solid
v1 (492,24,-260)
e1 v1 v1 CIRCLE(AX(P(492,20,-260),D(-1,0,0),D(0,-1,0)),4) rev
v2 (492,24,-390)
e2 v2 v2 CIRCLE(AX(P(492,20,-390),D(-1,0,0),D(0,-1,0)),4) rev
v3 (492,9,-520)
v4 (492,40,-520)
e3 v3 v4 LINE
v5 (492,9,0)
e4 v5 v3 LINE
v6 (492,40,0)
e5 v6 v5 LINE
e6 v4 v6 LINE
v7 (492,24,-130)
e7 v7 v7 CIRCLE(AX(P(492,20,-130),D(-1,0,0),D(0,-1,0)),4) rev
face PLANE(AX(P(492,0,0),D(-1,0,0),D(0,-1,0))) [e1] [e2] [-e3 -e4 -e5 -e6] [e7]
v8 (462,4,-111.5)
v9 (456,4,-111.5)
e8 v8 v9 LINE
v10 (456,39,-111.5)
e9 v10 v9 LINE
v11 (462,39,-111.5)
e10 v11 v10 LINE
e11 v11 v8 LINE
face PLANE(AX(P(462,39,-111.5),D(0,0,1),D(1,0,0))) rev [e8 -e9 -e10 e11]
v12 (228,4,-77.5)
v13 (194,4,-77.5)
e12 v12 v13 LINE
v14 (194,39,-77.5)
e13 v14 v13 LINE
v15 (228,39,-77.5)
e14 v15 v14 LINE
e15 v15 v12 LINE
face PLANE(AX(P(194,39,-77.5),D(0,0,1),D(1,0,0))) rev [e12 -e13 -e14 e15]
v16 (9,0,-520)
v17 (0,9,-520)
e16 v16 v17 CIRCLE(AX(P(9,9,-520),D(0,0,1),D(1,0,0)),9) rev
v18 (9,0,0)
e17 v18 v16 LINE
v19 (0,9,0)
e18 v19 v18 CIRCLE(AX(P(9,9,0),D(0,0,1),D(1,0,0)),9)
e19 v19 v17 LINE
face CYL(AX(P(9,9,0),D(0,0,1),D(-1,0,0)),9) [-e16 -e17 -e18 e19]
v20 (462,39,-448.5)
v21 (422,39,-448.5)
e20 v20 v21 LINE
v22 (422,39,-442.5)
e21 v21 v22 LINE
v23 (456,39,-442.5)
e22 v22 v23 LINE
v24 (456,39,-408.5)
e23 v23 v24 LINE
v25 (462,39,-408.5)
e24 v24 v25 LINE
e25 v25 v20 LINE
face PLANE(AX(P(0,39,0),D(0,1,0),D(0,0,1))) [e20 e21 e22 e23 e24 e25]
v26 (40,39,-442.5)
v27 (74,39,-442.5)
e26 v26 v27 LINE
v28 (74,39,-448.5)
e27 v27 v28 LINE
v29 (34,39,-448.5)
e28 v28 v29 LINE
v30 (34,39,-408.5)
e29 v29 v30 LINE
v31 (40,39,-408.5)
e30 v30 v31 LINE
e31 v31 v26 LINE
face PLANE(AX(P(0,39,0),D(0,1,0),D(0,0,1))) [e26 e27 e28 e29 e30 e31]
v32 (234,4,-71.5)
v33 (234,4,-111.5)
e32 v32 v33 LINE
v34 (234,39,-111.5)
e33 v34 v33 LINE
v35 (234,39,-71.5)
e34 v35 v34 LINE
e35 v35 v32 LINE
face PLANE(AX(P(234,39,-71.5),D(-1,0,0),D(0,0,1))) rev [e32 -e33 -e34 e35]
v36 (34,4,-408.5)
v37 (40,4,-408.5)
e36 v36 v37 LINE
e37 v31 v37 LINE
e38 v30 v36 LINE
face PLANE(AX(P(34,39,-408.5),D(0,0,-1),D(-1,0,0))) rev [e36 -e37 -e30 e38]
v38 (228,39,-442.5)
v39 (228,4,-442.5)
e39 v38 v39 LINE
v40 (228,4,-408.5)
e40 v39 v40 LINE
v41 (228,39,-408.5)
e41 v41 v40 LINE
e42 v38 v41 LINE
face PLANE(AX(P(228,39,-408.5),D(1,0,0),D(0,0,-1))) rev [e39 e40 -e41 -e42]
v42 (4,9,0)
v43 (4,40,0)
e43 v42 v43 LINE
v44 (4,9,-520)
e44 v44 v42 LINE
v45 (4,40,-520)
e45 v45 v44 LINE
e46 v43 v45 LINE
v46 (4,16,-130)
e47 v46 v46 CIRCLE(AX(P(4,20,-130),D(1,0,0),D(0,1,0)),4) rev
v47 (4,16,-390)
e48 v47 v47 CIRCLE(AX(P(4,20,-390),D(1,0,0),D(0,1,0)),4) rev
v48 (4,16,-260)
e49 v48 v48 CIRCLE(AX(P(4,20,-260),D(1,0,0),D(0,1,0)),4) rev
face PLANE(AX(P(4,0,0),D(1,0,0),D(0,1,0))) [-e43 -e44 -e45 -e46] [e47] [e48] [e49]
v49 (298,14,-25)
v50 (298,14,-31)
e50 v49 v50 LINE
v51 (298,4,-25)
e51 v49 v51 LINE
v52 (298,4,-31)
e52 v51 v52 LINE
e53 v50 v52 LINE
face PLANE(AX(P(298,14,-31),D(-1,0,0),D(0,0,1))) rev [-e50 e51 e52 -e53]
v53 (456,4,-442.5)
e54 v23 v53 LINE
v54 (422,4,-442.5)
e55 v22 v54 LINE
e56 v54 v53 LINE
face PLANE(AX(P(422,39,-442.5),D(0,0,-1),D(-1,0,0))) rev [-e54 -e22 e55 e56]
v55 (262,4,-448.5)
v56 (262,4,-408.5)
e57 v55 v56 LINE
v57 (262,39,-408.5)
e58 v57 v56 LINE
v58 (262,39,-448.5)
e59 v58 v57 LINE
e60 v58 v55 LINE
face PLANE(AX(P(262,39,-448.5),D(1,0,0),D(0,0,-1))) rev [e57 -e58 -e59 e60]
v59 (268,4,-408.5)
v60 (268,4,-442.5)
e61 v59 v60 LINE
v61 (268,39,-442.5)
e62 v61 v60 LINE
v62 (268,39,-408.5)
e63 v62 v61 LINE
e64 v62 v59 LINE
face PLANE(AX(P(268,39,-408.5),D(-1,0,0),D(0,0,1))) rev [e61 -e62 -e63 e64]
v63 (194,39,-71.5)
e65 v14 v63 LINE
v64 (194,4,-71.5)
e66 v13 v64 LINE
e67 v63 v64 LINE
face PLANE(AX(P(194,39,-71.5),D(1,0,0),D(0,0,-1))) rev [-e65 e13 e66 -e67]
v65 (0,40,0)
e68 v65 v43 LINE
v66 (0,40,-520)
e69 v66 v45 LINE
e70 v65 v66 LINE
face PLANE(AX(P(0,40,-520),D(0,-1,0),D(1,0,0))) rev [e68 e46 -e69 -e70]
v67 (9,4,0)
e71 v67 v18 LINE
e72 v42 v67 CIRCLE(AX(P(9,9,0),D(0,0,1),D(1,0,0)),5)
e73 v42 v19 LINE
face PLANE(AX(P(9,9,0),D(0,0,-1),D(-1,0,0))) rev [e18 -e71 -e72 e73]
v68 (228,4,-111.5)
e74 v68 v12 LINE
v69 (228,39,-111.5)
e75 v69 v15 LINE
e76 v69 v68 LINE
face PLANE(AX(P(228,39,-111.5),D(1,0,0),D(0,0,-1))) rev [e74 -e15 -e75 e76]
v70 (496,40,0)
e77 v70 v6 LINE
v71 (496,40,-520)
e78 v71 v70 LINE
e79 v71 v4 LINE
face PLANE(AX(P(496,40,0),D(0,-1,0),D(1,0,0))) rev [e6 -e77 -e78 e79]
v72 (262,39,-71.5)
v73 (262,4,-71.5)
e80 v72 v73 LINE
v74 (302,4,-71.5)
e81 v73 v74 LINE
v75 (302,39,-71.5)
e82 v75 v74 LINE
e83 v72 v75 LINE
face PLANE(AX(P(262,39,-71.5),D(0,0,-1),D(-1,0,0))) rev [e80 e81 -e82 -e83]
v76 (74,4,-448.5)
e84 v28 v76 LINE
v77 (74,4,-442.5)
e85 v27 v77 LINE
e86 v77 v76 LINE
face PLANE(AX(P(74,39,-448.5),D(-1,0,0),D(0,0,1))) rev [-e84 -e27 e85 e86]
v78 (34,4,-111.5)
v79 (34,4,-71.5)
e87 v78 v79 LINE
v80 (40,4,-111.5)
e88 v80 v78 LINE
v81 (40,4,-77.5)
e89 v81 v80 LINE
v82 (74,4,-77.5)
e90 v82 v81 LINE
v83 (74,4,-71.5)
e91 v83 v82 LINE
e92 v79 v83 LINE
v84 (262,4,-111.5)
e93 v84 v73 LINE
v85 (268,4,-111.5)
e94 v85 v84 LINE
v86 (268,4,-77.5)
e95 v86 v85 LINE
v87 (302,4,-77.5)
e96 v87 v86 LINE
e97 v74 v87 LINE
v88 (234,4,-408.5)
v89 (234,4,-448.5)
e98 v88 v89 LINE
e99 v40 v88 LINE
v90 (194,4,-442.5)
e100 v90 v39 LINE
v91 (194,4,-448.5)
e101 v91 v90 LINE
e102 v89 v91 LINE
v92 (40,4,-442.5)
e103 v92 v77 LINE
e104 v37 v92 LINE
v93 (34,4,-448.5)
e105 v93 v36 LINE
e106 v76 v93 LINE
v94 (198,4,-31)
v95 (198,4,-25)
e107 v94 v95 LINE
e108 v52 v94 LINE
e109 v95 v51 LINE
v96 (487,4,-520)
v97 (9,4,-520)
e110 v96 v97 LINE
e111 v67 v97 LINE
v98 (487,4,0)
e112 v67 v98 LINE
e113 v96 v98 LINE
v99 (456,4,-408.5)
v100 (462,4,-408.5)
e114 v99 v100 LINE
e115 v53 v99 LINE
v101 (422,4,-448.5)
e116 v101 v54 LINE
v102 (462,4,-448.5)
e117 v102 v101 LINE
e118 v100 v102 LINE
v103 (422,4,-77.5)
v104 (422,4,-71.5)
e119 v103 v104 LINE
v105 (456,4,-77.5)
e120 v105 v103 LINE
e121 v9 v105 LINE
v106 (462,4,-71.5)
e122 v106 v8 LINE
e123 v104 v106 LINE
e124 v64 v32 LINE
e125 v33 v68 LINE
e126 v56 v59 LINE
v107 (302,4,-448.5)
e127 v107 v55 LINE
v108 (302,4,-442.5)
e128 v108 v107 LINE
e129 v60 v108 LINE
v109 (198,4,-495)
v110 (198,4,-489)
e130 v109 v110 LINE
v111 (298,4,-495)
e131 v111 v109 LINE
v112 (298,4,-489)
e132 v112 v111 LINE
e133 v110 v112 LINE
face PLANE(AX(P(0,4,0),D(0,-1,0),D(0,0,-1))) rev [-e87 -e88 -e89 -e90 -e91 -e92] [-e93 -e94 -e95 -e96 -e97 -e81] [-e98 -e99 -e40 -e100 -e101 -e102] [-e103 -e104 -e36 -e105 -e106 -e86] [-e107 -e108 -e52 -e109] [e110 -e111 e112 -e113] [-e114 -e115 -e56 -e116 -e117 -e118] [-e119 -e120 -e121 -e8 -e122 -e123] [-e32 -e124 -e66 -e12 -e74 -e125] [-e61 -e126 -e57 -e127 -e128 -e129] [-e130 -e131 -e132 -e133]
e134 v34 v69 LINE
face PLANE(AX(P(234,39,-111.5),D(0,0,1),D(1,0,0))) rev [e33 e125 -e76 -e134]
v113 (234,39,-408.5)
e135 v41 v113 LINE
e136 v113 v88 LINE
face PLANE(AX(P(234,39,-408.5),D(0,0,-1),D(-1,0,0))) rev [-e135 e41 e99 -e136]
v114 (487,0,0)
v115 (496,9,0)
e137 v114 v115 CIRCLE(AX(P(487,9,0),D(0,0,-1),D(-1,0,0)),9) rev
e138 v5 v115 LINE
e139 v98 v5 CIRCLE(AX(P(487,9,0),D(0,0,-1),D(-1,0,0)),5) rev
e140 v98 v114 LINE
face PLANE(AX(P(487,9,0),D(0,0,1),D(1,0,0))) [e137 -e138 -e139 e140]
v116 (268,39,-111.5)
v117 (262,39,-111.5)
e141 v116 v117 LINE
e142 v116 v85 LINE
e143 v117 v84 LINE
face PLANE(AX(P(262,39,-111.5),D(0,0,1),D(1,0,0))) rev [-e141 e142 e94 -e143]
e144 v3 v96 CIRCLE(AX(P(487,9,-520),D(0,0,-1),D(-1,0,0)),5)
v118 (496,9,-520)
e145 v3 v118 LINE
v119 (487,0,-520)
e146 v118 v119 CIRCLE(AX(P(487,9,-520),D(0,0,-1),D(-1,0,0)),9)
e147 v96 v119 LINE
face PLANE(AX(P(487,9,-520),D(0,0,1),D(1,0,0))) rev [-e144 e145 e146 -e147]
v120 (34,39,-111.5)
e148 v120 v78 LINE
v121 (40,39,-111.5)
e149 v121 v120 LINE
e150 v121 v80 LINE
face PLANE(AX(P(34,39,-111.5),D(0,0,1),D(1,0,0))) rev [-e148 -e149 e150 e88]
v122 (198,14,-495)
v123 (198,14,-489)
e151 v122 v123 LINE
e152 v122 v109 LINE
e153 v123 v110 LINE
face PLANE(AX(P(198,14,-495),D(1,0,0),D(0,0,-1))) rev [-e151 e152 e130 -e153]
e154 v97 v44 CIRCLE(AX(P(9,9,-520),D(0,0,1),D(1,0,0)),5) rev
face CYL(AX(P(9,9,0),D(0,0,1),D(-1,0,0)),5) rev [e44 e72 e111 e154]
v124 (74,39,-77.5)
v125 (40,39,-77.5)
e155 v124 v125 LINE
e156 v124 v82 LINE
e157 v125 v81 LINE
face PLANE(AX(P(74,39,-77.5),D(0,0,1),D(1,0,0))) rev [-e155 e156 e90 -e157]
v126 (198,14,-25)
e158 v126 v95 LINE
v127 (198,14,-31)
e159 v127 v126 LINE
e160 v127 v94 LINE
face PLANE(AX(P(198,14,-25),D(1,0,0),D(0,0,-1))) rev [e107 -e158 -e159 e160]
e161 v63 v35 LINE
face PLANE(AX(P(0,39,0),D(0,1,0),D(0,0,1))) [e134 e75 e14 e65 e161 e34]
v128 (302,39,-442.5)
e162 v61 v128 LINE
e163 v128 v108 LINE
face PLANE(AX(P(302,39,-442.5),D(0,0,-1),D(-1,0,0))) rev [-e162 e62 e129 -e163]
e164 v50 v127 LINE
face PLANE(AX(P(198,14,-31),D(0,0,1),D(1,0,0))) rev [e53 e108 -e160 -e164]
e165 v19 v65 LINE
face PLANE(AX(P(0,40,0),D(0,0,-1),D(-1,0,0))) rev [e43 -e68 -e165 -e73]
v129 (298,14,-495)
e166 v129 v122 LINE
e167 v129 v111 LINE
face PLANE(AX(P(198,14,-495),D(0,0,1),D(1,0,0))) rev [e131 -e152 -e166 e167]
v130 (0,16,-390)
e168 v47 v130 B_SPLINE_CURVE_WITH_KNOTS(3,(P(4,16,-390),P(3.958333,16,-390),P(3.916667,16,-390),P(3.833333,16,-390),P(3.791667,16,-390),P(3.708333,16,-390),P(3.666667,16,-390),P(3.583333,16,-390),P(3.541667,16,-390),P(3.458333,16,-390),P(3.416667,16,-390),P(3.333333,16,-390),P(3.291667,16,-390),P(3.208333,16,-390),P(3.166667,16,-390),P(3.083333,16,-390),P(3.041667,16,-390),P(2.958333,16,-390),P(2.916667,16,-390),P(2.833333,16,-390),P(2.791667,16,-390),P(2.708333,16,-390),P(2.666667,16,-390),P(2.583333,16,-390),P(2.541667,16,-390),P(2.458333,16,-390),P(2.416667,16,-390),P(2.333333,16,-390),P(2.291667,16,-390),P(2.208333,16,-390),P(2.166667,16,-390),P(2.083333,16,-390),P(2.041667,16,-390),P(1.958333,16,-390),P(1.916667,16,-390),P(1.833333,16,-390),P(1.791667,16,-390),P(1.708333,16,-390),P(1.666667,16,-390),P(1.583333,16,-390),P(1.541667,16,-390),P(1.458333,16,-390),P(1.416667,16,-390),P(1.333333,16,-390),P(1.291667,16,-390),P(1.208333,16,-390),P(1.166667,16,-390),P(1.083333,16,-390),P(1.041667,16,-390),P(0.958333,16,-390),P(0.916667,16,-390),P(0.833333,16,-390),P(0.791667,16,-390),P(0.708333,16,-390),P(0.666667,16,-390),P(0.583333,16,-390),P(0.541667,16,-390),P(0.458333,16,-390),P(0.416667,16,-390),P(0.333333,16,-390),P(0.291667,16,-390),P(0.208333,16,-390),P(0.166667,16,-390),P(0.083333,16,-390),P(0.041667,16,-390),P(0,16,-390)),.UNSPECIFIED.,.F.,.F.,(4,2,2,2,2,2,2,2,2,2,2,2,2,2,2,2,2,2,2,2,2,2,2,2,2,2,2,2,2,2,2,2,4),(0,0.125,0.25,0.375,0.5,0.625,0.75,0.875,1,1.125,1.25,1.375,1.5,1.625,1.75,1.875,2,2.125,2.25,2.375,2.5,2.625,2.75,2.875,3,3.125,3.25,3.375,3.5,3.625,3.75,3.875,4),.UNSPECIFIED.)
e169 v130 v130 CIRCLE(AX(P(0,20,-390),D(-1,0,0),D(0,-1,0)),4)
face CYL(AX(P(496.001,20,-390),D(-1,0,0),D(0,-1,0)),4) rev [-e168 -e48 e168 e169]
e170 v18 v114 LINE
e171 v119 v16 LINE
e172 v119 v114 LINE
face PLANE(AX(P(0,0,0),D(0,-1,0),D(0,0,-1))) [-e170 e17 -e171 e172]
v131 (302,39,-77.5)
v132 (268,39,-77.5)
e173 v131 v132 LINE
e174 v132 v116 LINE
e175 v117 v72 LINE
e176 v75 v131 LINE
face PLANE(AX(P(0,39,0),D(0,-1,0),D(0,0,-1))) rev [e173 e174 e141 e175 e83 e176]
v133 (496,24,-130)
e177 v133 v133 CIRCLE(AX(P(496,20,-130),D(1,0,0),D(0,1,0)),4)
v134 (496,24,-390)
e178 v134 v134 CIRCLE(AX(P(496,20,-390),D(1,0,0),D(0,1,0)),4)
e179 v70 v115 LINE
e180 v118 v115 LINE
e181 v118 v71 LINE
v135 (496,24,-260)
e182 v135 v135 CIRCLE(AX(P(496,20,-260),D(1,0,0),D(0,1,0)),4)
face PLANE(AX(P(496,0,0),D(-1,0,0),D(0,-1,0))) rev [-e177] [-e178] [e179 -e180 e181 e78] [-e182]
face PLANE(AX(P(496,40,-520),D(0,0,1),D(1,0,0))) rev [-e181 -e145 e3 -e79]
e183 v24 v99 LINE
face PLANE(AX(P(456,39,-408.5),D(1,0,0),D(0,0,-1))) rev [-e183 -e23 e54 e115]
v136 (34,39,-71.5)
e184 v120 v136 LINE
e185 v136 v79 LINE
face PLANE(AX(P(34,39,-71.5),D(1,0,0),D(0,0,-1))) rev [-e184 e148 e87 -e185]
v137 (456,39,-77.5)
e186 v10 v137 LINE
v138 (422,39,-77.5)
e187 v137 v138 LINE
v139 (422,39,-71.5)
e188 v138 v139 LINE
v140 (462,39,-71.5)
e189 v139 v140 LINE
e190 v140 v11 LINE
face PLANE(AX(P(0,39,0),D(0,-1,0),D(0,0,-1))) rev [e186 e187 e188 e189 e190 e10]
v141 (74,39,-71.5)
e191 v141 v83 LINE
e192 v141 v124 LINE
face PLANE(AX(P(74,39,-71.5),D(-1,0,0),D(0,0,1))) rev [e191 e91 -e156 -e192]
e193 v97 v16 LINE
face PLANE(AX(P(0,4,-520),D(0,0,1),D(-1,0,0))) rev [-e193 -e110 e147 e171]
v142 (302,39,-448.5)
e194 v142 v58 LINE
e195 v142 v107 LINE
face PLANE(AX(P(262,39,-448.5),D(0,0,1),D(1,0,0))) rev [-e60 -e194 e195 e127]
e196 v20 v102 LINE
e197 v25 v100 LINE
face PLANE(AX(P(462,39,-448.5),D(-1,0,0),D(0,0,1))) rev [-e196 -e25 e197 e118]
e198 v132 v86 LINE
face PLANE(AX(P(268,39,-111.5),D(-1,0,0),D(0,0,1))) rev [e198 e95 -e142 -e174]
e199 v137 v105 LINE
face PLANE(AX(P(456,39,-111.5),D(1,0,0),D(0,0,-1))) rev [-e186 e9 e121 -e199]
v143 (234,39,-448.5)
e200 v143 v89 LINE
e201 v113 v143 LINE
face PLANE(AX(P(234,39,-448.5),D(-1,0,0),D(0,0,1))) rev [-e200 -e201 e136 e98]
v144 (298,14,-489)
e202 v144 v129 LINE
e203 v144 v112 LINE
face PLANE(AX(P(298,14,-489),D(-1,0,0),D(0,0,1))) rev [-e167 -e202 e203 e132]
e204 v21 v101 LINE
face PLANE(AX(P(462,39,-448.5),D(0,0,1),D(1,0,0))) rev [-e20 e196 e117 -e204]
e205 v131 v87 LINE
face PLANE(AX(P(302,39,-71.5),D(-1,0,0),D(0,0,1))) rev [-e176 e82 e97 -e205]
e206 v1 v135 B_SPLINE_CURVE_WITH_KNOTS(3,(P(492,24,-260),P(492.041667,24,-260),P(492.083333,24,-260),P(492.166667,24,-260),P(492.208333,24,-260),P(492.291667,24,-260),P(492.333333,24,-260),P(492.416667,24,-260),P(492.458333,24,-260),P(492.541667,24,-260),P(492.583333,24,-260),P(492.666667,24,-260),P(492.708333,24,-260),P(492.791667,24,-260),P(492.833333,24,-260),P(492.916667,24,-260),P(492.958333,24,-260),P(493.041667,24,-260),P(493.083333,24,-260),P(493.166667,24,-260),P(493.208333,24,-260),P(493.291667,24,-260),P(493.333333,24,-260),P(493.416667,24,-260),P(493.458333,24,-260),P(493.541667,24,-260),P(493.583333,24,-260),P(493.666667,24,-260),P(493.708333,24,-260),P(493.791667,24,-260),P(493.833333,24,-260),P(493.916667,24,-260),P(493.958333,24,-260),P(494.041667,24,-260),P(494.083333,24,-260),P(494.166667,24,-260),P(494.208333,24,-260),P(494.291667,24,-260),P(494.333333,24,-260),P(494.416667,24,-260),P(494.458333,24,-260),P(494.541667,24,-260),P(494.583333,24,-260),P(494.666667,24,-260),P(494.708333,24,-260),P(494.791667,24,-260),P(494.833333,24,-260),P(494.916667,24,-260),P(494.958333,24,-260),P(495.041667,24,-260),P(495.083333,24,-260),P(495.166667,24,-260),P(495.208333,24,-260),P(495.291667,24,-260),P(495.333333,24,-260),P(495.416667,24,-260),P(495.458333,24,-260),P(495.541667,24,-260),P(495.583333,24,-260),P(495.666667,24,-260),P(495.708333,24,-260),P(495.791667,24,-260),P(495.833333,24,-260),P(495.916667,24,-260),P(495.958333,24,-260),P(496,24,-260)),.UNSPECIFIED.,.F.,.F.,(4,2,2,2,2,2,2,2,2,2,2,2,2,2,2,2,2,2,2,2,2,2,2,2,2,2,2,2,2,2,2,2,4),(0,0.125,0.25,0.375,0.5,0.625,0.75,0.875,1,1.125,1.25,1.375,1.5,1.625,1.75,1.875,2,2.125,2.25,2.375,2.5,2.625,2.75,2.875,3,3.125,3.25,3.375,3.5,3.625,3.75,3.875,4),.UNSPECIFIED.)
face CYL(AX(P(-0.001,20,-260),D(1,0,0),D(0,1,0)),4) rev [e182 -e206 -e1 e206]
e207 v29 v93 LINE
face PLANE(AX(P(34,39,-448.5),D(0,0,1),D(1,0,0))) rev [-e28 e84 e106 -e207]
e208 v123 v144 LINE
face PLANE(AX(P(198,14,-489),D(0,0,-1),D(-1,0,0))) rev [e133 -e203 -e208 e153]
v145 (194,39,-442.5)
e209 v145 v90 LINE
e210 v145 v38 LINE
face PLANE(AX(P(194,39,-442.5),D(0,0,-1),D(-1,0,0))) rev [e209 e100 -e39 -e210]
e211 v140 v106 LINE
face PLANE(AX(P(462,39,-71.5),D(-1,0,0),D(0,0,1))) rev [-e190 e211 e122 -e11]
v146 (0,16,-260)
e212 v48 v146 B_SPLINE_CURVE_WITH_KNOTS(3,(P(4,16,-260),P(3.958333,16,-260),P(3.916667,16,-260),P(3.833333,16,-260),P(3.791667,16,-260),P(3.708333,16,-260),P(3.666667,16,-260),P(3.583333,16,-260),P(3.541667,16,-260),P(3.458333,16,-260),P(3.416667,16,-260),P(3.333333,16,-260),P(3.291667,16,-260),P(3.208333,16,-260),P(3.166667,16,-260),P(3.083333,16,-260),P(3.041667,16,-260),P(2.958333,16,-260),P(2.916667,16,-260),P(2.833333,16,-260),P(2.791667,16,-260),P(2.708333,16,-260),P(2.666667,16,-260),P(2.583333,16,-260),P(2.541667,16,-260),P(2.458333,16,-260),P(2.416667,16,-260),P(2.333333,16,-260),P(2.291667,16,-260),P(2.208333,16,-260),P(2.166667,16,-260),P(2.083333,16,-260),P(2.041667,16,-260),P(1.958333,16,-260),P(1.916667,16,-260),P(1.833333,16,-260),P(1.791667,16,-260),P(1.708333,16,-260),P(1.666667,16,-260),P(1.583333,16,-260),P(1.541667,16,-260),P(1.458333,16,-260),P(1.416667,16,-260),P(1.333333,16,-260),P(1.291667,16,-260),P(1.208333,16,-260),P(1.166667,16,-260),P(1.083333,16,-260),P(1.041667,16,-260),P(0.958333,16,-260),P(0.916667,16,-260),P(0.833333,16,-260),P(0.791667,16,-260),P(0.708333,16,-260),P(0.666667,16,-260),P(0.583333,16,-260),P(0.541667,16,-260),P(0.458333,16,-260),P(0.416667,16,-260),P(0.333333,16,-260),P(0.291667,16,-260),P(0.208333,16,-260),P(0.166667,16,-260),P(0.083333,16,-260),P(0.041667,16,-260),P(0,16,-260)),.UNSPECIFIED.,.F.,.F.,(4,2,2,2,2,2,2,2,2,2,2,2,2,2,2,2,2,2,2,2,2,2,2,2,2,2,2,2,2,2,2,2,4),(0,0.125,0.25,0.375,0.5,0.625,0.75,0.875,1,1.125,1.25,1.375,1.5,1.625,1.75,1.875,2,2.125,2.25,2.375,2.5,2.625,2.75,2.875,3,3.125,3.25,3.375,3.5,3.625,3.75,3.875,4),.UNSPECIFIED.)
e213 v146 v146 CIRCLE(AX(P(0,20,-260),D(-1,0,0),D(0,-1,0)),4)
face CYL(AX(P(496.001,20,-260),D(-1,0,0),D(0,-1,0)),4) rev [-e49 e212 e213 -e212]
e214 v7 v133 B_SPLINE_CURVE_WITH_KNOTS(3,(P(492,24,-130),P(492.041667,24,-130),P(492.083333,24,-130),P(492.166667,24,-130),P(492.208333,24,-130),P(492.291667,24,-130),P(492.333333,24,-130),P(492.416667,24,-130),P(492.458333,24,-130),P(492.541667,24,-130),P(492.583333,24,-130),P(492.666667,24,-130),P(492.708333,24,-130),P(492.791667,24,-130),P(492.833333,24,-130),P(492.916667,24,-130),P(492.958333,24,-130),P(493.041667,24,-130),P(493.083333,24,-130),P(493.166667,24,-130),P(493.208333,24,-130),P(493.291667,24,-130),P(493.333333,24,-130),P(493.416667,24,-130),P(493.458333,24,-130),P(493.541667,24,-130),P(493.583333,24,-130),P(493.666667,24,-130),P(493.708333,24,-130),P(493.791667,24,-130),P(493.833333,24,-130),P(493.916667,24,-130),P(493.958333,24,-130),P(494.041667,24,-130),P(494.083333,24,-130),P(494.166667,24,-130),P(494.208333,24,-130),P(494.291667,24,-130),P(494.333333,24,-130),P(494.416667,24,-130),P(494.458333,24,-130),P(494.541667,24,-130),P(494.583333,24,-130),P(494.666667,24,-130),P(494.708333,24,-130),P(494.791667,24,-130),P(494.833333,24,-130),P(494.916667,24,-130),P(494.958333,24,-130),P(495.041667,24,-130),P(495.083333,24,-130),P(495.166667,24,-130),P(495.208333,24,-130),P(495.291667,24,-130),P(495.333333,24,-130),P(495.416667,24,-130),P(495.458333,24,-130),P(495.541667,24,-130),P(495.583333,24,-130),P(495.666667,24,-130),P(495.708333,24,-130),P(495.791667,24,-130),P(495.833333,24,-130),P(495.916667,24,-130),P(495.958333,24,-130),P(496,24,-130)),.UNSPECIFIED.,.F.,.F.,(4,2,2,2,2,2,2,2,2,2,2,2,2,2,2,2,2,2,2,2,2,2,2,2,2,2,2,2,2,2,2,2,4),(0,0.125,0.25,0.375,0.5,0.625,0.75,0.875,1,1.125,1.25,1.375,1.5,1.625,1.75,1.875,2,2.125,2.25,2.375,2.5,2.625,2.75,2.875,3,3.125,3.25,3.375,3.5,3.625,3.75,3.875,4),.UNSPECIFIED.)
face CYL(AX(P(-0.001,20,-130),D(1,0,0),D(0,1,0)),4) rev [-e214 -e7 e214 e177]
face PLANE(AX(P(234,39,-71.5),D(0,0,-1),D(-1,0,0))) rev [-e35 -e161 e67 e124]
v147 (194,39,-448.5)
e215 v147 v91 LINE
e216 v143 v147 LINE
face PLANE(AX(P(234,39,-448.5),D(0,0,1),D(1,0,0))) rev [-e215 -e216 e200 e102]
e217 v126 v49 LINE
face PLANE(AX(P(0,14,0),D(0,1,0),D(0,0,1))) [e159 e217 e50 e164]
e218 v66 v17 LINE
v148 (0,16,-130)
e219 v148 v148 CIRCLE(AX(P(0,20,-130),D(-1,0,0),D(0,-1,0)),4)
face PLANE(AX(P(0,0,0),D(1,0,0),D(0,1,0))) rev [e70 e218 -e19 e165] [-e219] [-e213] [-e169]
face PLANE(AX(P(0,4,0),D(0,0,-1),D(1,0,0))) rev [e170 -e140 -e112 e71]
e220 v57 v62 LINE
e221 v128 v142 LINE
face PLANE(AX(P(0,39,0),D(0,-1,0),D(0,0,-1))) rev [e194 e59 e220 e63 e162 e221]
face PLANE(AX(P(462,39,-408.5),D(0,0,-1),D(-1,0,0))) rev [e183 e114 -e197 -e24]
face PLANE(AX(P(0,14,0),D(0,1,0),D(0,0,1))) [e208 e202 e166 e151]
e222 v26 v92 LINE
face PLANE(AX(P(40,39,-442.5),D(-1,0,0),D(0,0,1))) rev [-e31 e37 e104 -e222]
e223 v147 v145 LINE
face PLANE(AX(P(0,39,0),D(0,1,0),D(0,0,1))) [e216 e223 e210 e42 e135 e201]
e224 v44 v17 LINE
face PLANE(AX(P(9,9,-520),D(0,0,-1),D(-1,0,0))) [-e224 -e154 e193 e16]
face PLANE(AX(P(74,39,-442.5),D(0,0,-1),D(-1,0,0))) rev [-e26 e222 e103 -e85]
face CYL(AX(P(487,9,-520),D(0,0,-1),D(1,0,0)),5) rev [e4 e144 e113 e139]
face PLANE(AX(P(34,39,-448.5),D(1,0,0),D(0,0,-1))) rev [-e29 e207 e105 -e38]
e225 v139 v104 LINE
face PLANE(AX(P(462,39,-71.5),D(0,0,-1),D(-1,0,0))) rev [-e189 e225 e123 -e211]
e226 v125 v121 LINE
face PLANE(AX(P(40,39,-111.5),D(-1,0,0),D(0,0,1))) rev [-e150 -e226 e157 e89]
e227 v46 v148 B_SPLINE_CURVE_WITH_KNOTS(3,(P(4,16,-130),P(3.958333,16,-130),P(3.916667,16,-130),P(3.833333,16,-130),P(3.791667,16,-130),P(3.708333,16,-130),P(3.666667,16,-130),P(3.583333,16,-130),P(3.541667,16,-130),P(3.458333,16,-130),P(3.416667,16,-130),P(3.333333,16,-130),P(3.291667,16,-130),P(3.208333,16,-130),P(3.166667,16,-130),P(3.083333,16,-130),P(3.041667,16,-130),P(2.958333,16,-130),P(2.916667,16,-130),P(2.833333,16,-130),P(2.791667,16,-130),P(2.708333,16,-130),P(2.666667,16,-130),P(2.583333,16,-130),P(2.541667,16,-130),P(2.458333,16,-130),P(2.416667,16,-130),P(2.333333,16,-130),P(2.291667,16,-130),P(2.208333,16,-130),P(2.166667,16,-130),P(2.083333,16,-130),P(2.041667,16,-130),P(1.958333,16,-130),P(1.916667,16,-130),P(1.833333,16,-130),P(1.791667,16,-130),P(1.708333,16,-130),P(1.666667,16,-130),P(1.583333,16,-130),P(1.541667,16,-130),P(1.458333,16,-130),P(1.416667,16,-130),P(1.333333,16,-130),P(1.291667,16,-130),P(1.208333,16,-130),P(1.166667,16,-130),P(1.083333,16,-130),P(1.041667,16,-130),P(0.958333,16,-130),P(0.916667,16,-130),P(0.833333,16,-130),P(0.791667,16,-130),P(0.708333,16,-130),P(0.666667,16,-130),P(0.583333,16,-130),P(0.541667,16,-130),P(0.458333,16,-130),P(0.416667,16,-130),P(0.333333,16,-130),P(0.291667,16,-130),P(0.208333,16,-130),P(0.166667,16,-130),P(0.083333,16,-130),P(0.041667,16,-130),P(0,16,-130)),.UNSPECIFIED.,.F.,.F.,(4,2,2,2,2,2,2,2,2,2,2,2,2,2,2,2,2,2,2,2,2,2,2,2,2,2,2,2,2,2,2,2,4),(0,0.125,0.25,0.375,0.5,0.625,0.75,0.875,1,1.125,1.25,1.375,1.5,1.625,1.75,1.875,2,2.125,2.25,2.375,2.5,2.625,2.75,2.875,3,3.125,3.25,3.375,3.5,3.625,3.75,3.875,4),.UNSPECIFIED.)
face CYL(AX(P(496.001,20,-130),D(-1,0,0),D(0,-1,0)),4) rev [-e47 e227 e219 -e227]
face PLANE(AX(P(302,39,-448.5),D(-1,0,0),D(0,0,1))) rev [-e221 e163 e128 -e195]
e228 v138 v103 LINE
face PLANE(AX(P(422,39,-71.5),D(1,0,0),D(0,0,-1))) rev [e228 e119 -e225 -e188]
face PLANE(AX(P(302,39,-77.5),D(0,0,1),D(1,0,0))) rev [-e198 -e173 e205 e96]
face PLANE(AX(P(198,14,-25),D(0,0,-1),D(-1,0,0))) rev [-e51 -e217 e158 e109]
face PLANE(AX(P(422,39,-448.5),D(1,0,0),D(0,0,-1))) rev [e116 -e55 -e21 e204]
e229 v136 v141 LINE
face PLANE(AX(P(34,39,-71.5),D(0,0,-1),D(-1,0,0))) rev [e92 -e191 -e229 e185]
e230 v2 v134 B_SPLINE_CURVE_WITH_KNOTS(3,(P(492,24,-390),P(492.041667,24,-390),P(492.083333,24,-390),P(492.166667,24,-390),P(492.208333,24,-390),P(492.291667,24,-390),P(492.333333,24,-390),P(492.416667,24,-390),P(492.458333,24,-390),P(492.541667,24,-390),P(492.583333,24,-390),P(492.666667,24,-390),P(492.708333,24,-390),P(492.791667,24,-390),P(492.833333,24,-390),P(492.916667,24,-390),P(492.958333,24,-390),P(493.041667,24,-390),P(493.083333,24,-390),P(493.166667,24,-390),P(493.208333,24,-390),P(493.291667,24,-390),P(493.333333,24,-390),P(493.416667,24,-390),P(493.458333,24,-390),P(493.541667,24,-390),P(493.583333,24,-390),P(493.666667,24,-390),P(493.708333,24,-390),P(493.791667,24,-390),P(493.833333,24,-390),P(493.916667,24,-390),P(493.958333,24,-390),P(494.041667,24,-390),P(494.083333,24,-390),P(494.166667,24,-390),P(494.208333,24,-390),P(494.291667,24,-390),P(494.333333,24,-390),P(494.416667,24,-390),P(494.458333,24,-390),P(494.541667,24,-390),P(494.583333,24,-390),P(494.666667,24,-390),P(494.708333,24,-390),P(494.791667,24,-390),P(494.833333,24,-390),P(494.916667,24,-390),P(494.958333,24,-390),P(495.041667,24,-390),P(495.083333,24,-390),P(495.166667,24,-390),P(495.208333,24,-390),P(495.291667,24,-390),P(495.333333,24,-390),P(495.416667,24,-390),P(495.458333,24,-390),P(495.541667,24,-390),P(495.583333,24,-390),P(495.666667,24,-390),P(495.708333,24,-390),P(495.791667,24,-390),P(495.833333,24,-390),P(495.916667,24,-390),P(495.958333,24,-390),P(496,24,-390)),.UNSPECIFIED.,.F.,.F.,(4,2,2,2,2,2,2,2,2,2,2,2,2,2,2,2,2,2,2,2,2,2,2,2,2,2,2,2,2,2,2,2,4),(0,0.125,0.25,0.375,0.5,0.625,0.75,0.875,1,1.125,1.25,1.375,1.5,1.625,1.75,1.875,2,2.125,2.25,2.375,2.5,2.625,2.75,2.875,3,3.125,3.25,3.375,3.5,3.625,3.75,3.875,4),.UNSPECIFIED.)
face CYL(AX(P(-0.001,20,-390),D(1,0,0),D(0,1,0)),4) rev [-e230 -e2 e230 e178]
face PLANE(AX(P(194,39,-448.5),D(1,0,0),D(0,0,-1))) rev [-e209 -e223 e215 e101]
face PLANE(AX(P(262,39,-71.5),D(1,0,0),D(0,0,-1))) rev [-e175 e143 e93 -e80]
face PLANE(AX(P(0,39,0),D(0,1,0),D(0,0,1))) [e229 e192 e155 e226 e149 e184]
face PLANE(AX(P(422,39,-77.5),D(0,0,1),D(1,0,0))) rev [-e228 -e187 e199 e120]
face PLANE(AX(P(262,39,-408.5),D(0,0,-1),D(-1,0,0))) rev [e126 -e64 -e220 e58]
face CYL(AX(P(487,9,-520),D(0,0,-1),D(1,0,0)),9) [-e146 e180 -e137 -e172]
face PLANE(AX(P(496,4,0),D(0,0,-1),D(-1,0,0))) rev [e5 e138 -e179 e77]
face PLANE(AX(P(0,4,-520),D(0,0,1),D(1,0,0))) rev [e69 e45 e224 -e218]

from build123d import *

# Parameters (mm, degrees)
SKETCH1_W                    = 496
SKETCH1_H                    = 520
BOSS_EXTRUDE1_DEPTH          = 4
EDGE_FLANGE1_STRIP_W         = 26
EDGE_FLANGE1_STRIP_H         = 4
EDGE_FLANGE1_STRIP_CUT_DEPTH = 520
EDGE_FLANGE1_DEPTH           = 520
EDGE_FLANGE2_STRIP_W         = 26
EDGE_FLANGE2_STRIP_H         = 4
EDGE_FLANGE2_STRIP_CUT_DEPTH = 520
EDGE_FLANGE2_DEPTH           = 520
CUT_EXTRUDE1_REACH           = 721.733
SKETCH17_R                   = 4
CUT_EXTRUDE2_REACH           = 721.733
SKETCH19_R                   = 4
BOSS_EXTRUDE2_DEPTH          = 35
SKETCH21_W                   = 100
SKETCH21_H                   = 6
BOSS_EXTRUDE3_DEPTH          = 10


# Sheet-metal steps are written as plain solids
with BuildPart() as part:
    # Sketch1 → Boss-Extrude1 (new body)
    with BuildSketch(Plane(origin=(0, 0, 0), x_dir=(1, 0, 0), z_dir=(0, 1, 0))):
        with Locations((248, 260)):
            Rectangle(SKETCH1_W, SKETCH1_H)
    extrude(amount=BOSS_EXTRUDE1_DEPTH)

    # Edge-Flange1 strip (across the edge) → Edge-Flange1 strip cut (cut)
    with BuildSketch(Plane(origin=(0, 4, -520), x_dir=(1, 0, 0), z_dir=(0, 0, 1))):
        with Locations((-4, -2)):
            Rectangle(EDGE_FLANGE1_STRIP_W, EDGE_FLANGE1_STRIP_H)
    extrude(amount=EDGE_FLANGE1_STRIP_CUT_DEPTH, mode=Mode.SUBTRACT)

    # Edge-Flange1 section (across the edge) → Edge-Flange1 (add)
    with BuildSketch(Plane(origin=(0, 4, -520), x_dir=(1, 0, 0), z_dir=(0, 0, 1))):
        with BuildLine():
            Line((0, 5), (0, 36))
            Line((0, 36), (4, 36))
            Line((4, 36), (4, 5))
            ThreePointArc((4, 5), (5.464466094, 1.464466094), (9, 0))
            Line((9, 0), (9, -4))
            ThreePointArc((9, -4), (2.636038969, -1.363961031), (0, 5))
        make_face()
    extrude(amount=EDGE_FLANGE1_DEPTH)

    # Edge-Flange2 strip (across the edge) → Edge-Flange2 strip cut (cut)
    with BuildSketch(Plane(origin=(496, 4, 0), x_dir=(-1, 0, 0), z_dir=(0, 0, -1))):
        with Locations((-4, -2)):
            Rectangle(EDGE_FLANGE2_STRIP_W, EDGE_FLANGE2_STRIP_H)
    extrude(amount=EDGE_FLANGE2_STRIP_CUT_DEPTH, mode=Mode.SUBTRACT)

    # Edge-Flange2 section (across the edge) → Edge-Flange2 (add)
    with BuildSketch(Plane(origin=(496, 4, 0), x_dir=(-1, 0, 0), z_dir=(0, 0, -1))):
        with BuildLine():
            Line((0, 5), (0, 36))
            Line((0, 36), (4, 36))
            Line((4, 36), (4, 5))
            ThreePointArc((4, 5), (5.464466094, 1.464466094), (9, 0))
            Line((9, 0), (9, -4))
            ThreePointArc((9, -4), (2.636038969, -1.363961031), (0, 5))
        make_face()
    extrude(amount=EDGE_FLANGE2_DEPTH)

    # Sketch17 → Cut-Extrude1 (cut, up to next)
    with BuildSketch(Plane.ZY, mode=Mode.PRIVATE) as cut_extrude1_sk1:
        with Locations(Location((-390, 20, 0), (0, 0, 270))):
            Circle(SKETCH17_R)
    cut_extrude1_tool1 = extrude(cut_extrude1_sk1.sketch, amount=-CUT_EXTRUDE1_REACH, mode=Mode.PRIVATE) & part.part
    # Sketch17 → Cut-Extrude1 (cut, up to next)
    with BuildSketch(Plane.ZY, mode=Mode.PRIVATE) as cut_extrude1_sk2:
        with Locations(Location((-260, 20, 0), (0, 0, 270))):
            Circle(SKETCH17_R)
    cut_extrude1_tool2 = extrude(cut_extrude1_sk2.sketch, amount=-CUT_EXTRUDE1_REACH, mode=Mode.PRIVATE) & part.part
    # Sketch17 → Cut-Extrude1 (cut, up to next)
    with BuildSketch(Plane.ZY, mode=Mode.PRIVATE) as cut_extrude1_sk3:
        with Locations(Location((-130, 20, 0), (0, 0, 270))):
            Circle(SKETCH17_R)
    cut_extrude1_tool3 = extrude(cut_extrude1_sk3.sketch, amount=-CUT_EXTRUDE1_REACH, mode=Mode.PRIVATE) & part.part
    add(cut_extrude1_tool1.solids().sort_by_distance((0, 20, -390))[0], mode=Mode.SUBTRACT)
    add(cut_extrude1_tool2.solids().sort_by_distance((0, 20, -260))[0], mode=Mode.SUBTRACT)
    add(cut_extrude1_tool3.solids().sort_by_distance((0, 20, -130))[0], mode=Mode.SUBTRACT)

    # Sketch19 → Cut-Extrude2 (cut, up to next)
    with BuildSketch(Plane(origin=(496, 0, 0), x_dir=(0, 0, -1), z_dir=(1, 0, 0)), mode=Mode.PRIVATE) as cut_extrude2_sk1:
        with Locations(Location((130, 20, 0), (0, 0, 270))):
            Circle(SKETCH19_R)
    cut_extrude2_tool1 = extrude(cut_extrude2_sk1.sketch, amount=-CUT_EXTRUDE2_REACH, mode=Mode.PRIVATE) & part.part
    # Sketch19 → Cut-Extrude2 (cut, up to next)
    with BuildSketch(Plane(origin=(496, 0, 0), x_dir=(0, 0, -1), z_dir=(1, 0, 0)), mode=Mode.PRIVATE) as cut_extrude2_sk2:
        with Locations(Location((260, 20, 0), (0, 0, 270))):
            Circle(SKETCH19_R)
    cut_extrude2_tool2 = extrude(cut_extrude2_sk2.sketch, amount=-CUT_EXTRUDE2_REACH, mode=Mode.PRIVATE) & part.part
    # Sketch19 → Cut-Extrude2 (cut, up to next)
    with BuildSketch(Plane(origin=(496, 0, 0), x_dir=(0, 0, -1), z_dir=(1, 0, 0)), mode=Mode.PRIVATE) as cut_extrude2_sk3:
        with Locations(Location((390, 20, 0), (0, 0, 270))):
            Circle(SKETCH19_R)
    cut_extrude2_tool3 = extrude(cut_extrude2_sk3.sketch, amount=-CUT_EXTRUDE2_REACH, mode=Mode.PRIVATE) & part.part
    add(cut_extrude2_tool1.solids().sort_by_distance((496, 20, -130))[0], mode=Mode.SUBTRACT)
    add(cut_extrude2_tool2.solids().sort_by_distance((496, 20, -260))[0], mode=Mode.SUBTRACT)
    add(cut_extrude2_tool3.solids().sort_by_distance((496, 20, -390))[0], mode=Mode.SUBTRACT)

    # Sketch20 → Boss-Extrude2 (add)
    with BuildSketch(Plane(origin=(0, 4, 0), x_dir=(1, 0, 0), z_dir=(0, 1, 0))):
        Polygon((34, 448.5), (74, 448.5), (74, 442.5), (40, 442.5), (40, 408.5), (34, 408.5), align=None)
        Polygon((234, 448.5), (194, 448.5), (194, 442.5), (228, 442.5), (228, 408.5), (234, 408.5), align=None)
        Polygon((234, 71.5), (194, 71.5), (194, 77.5), (228, 77.5), (228, 111.5), (234, 111.5), align=None)
        Polygon((34, 71.5), (34, 111.5), (40, 111.5), (40, 77.5), (74, 77.5), (74, 71.5), align=None)
        Polygon((262, 448.5), (302, 448.5), (302, 442.5), (268, 442.5), (268, 408.5), (262, 408.5), align=None)
        Polygon((462, 448.5), (422, 448.5), (422, 442.5), (456, 442.5), (456, 408.5), (462, 408.5), align=None)
        Polygon((262, 71.5), (302, 71.5), (302, 77.5), (268, 77.5), (268, 111.5), (262, 111.5), align=None)
        Polygon((462, 71.5), (462, 111.5), (456, 111.5), (456, 77.5), (422, 77.5), (422, 71.5), align=None)
    extrude(amount=BOSS_EXTRUDE2_DEPTH)

    # Sketch21 → Boss-Extrude3 (add)
    with BuildSketch(Plane(origin=(0, 4, 0), x_dir=(1, 0, 0), z_dir=(0, 1, 0))):
        with Locations((248, 28)):
            Rectangle(SKETCH21_W, SKETCH21_H)
        with Locations((248, 492)):
            Rectangle(SKETCH21_W, SKETCH21_H)
    extrude(amount=BOSS_EXTRUDE3_DEPTH)


solid = part.part
